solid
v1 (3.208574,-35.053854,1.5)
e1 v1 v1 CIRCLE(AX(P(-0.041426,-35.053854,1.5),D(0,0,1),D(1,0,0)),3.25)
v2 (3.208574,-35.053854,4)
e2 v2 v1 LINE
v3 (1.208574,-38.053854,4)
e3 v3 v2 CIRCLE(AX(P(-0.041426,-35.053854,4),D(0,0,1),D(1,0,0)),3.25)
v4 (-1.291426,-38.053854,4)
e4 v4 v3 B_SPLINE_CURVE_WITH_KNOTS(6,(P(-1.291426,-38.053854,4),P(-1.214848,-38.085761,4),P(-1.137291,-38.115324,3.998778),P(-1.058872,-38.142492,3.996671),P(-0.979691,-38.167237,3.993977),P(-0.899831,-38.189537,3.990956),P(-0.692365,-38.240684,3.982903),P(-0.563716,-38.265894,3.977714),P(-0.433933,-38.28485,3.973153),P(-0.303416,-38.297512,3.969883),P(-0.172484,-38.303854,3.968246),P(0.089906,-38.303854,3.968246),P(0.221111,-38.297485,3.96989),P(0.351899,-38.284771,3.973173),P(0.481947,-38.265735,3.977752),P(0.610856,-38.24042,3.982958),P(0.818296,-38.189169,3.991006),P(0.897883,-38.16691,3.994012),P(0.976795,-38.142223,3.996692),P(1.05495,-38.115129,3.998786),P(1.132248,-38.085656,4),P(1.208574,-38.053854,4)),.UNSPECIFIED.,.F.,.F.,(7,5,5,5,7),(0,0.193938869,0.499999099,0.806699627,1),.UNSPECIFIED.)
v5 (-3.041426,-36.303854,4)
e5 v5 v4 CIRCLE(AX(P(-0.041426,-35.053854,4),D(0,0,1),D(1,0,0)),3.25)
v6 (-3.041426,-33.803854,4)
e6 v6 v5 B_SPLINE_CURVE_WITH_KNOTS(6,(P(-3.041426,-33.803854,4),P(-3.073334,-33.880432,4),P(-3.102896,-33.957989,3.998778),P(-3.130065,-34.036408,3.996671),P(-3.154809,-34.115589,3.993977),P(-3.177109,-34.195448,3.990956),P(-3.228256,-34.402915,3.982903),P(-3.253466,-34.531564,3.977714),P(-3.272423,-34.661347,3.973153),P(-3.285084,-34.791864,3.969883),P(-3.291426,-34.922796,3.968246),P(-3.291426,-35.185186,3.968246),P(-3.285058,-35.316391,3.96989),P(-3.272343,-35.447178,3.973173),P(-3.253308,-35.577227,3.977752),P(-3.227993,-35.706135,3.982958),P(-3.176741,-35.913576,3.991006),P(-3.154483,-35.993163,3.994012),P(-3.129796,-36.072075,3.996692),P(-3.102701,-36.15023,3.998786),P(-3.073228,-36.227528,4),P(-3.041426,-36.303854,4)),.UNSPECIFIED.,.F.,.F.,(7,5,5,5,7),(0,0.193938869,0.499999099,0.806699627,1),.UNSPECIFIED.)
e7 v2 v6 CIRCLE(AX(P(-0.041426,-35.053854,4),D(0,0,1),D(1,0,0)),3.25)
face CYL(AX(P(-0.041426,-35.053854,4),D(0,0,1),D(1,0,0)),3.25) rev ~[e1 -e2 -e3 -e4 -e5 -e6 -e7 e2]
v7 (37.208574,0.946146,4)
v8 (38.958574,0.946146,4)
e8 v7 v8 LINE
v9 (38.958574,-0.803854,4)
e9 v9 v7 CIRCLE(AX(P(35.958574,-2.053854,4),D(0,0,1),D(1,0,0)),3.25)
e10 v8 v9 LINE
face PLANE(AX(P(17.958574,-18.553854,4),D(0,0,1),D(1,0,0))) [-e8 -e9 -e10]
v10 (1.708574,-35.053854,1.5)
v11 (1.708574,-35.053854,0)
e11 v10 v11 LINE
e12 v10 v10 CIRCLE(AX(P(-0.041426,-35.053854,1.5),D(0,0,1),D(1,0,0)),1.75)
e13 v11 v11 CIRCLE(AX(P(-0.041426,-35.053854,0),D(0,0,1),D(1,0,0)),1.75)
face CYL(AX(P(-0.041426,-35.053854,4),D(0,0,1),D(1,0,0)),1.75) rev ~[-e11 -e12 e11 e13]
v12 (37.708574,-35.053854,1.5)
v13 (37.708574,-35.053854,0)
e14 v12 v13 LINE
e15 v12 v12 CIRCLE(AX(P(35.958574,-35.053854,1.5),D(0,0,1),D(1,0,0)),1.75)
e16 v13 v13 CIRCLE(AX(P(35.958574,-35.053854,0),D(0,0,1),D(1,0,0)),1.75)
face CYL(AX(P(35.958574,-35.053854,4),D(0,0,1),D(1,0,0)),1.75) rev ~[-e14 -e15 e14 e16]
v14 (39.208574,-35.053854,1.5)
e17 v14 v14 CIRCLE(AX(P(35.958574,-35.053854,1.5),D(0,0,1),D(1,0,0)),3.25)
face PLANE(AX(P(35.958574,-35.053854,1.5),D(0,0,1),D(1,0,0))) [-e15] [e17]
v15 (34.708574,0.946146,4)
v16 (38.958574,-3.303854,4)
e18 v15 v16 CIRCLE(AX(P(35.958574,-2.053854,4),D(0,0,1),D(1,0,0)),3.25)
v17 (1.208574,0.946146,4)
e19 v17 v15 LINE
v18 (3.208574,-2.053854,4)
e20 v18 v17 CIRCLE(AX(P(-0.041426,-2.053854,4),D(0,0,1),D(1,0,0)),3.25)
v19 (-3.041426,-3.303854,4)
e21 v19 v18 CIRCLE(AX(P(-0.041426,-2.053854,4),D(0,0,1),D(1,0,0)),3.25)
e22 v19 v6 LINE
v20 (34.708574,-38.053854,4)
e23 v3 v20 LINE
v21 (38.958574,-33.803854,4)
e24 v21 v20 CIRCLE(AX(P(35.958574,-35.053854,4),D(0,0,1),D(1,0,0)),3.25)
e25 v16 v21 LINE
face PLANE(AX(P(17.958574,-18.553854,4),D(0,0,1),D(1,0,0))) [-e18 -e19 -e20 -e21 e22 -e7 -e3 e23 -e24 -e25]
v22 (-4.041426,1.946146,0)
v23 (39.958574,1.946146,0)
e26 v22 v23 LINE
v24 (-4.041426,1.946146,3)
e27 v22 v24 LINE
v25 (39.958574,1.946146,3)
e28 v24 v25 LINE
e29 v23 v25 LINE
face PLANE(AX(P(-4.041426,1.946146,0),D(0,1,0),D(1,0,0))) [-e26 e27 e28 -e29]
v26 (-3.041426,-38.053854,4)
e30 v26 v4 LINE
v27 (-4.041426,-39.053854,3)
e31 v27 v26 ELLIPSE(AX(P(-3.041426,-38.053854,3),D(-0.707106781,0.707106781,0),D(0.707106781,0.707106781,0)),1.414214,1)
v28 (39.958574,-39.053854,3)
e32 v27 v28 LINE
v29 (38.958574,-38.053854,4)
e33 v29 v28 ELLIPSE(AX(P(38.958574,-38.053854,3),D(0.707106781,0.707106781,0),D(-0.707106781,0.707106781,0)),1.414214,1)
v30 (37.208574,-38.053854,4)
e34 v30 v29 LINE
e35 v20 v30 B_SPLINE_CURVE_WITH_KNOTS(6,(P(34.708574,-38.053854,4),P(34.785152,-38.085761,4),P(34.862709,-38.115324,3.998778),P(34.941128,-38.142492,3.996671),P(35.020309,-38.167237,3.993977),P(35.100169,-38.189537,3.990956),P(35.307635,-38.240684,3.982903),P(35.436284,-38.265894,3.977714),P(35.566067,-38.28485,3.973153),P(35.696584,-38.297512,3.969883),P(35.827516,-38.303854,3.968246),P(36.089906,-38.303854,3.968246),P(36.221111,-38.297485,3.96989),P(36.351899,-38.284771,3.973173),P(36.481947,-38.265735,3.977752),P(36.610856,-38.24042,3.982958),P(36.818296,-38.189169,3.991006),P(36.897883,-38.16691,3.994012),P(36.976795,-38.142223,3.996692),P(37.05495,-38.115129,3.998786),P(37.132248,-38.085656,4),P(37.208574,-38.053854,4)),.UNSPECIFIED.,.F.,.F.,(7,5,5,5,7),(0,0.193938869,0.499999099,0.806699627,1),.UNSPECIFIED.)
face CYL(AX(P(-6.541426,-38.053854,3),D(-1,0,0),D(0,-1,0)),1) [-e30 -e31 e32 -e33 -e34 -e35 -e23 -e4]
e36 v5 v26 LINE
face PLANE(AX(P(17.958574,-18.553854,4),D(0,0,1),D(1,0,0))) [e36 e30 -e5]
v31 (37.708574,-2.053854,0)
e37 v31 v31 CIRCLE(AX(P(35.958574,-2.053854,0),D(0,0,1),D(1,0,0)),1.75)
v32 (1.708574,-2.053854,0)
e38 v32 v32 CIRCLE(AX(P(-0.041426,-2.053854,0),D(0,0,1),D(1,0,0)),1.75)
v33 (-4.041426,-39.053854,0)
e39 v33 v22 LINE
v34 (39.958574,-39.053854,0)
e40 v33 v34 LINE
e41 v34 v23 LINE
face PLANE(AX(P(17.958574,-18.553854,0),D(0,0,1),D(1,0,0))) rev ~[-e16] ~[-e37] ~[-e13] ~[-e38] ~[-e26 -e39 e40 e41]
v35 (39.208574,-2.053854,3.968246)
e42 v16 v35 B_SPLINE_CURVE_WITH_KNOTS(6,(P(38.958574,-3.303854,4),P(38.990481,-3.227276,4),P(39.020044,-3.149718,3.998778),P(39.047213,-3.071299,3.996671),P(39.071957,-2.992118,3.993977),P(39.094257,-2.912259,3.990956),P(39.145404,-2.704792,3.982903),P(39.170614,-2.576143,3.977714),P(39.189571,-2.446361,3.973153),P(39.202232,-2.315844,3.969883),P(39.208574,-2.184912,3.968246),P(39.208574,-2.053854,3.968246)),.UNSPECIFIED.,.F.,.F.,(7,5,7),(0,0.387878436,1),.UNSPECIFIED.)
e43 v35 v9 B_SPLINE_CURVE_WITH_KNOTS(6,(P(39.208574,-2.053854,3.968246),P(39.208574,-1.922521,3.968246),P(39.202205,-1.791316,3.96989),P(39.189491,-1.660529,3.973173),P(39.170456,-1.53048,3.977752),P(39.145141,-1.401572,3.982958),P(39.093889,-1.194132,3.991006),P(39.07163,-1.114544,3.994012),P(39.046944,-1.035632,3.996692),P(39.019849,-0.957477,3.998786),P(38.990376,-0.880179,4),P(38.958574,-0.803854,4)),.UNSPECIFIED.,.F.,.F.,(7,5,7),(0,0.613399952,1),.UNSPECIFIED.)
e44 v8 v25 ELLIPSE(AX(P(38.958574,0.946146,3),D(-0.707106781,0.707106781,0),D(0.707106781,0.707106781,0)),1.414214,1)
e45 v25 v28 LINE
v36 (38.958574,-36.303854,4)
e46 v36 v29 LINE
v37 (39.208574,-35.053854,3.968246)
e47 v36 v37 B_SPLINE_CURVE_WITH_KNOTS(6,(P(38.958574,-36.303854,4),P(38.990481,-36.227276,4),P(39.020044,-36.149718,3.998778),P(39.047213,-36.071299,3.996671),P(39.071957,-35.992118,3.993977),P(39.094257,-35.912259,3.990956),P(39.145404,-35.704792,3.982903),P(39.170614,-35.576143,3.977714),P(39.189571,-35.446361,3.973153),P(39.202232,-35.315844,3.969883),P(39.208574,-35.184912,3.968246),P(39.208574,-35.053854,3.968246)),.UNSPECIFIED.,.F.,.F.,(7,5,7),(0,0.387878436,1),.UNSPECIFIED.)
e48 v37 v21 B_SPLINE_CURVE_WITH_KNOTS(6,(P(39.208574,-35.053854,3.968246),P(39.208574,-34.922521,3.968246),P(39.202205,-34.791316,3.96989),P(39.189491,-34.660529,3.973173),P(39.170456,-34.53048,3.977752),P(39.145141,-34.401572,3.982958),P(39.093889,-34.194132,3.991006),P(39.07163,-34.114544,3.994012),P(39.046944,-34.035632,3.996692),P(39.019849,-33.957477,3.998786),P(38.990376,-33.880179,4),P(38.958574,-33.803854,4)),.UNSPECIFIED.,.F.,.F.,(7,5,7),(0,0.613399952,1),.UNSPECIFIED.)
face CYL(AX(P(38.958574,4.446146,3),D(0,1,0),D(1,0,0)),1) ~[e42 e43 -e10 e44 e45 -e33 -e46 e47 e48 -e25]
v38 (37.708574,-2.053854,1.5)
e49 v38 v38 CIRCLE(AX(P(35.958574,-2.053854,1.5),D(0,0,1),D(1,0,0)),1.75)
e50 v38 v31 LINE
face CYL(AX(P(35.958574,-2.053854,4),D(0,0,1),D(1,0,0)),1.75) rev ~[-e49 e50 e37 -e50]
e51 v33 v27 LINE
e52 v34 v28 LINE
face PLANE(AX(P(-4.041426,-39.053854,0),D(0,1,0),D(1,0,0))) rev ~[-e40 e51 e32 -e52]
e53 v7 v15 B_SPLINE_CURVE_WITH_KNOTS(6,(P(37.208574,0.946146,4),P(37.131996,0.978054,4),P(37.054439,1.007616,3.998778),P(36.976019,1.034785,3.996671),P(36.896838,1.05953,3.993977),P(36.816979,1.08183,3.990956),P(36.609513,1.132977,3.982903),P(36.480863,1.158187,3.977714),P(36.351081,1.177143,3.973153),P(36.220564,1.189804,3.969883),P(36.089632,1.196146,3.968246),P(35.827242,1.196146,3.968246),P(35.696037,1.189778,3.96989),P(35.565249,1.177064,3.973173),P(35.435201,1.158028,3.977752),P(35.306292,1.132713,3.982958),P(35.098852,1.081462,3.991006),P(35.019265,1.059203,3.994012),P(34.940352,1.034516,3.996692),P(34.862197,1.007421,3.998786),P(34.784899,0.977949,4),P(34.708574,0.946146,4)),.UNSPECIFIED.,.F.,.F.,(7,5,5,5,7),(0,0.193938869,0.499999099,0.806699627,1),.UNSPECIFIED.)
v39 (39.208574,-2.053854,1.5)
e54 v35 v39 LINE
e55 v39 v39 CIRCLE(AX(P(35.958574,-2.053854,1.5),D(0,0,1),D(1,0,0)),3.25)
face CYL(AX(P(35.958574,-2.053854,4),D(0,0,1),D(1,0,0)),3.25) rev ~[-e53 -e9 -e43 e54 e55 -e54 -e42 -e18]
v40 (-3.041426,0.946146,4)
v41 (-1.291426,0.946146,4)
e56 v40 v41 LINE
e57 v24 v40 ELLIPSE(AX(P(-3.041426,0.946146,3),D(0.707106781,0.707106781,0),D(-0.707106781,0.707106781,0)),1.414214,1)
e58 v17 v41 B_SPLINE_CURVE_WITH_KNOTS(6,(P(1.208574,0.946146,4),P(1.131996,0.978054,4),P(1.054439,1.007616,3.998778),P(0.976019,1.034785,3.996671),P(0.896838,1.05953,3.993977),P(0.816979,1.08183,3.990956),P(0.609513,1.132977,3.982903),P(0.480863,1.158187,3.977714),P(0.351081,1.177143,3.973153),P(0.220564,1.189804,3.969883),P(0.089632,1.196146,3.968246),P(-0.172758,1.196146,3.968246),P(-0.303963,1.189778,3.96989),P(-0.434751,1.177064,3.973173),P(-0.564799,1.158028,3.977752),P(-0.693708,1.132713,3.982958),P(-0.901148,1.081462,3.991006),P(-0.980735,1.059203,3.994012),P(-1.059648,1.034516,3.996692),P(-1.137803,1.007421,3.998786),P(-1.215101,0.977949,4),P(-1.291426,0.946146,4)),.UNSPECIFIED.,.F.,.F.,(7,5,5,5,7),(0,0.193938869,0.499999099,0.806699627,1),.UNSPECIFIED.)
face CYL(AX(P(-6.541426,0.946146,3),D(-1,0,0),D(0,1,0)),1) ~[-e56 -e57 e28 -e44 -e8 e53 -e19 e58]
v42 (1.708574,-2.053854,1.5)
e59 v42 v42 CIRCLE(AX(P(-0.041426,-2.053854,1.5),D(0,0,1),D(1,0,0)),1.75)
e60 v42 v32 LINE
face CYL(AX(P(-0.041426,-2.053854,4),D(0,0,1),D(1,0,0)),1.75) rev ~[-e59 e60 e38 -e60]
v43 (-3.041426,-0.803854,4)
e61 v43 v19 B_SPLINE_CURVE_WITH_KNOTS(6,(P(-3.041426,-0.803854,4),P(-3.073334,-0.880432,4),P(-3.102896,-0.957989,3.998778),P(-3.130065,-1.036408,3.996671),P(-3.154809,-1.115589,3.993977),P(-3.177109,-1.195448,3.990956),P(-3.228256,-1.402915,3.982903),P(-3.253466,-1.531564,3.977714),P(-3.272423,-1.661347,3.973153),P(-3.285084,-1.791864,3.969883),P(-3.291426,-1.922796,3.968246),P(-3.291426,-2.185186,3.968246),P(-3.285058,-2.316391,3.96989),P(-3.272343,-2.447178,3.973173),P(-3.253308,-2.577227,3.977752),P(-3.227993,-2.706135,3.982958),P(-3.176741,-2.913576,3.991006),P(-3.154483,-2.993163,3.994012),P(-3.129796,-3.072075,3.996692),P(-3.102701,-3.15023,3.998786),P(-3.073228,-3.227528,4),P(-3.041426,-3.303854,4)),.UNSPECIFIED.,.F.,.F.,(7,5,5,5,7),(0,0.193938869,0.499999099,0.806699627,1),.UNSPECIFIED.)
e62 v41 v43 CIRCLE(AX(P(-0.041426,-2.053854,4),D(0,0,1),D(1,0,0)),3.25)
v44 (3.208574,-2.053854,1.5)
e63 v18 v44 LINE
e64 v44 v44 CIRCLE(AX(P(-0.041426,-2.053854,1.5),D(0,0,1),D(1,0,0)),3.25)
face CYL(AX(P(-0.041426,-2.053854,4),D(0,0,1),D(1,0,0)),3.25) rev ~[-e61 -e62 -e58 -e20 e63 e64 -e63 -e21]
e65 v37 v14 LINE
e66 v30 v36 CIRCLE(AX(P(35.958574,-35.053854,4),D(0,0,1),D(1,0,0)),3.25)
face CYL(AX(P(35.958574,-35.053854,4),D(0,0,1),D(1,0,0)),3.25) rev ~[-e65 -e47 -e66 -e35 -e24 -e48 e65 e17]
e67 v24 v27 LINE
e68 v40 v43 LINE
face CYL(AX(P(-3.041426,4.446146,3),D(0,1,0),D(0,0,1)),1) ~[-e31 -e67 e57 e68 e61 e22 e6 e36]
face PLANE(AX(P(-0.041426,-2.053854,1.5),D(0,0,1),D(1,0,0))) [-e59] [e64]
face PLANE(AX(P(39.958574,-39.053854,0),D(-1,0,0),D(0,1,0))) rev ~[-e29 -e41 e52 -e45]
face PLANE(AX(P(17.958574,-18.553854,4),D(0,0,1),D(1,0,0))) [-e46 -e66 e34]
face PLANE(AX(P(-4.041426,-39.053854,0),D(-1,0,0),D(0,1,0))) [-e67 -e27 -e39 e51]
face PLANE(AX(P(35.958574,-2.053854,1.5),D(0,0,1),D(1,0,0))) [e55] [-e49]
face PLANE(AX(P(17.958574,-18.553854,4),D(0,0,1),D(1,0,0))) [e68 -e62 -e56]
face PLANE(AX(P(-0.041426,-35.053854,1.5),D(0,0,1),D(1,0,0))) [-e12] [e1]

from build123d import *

# Parameters (mm, degrees)
F0_W        = 44
F0_H        = 41
F1_DEPTH    = 4
F2_R        = 1.75
F3_DEPTH    = 4.001
F4_R        = 3.25
F5_DEPTH    = 2.5
F6_T1_DEPTH = 46
F6_T3_DEPTH = 49


# Not quite as in the source:
# - a fillet or chamfer that OpenCascade refuses, or shapes differently, is made with other operations: its cross-section is extruded or revolved along the edge and cut away or added


with BuildPart() as f1:
    # F0 (on Top) → F1 (new body)
    with BuildSketch(Plane.XY):
        with Locations((17.9585738778, -18.5538536012)):
            Rectangle(F0_W, F0_H)
    extrude(amount=F1_DEPTH)

    # F2 (on face) → F3 (cut, through all)
    with BuildSketch(Plane.XY.offset(4)):
        with Locations((-0.0414261222, -2.0538536012)):
            Circle(F2_R)
        with Locations((35.9585738778, -2.0538536012)):
            Circle(F2_R)
        with Locations((35.9585738778, -35.0538536012)):
            Circle(F2_R)
        with Locations((-0.0414261222, -35.0538536012)):
            Circle(F2_R)
    extrude(amount=-F3_DEPTH, mode=Mode.SUBTRACT)

    # F4 (on face) → F5 (cut)
    with BuildSketch(Plane.XY.offset(4)):
        with Locations((-0.0414261222, -2.0538536012)):
            Circle(F4_R)
        with Locations((35.9585738778, -2.0538536012)):
            Circle(F4_R)
        with Locations((35.9585738778, -35.0538536012)):
            Circle(F4_R)
        with Locations((-0.0414261222, -35.0538536012)):
            Circle(F4_R)
    extrude(amount=-F5_DEPTH, mode=Mode.SUBTRACT)

    # F6: fillet of radius 1 on 4 edges, made by hand

    # F6_s2 → F6_t1 (cut)
    with BuildSketch(Plane.XZ.offset(-4.4461463988)):
        with BuildLine():
            ThreePointArc((-3.0414261222, 4), (-3.7485329034, 3.7071067812), (-4.0414261222, 3))
            Line((-4.0414261222, 3), (-4.0414261222, 4))
            Line((-4.0414261222, 4), (-3.0414261222, 4))
        make_face()
        with BuildLine():
            ThreePointArc((39.9585738778, 3), (39.665680659, 3.7071067812), (38.9585738778, 4))
            Line((38.9585738778, 4), (39.9585738778, 4))
            Line((39.9585738778, 4), (39.9585738778, 3))
        make_face()
    extrude(amount=F6_T1_DEPTH, mode=Mode.SUBTRACT)

    # F6_s4 → F6_t3 (cut)
    with BuildSketch(Plane.YZ.offset(-6.5414261222)):
        with BuildLine():
            ThreePointArc((-39.0538536012, 3), (-38.7609603824, 3.7071067812), (-38.0538536012, 4))
            Line((-38.0538536012, 4), (-39.0538536012, 4))
            Line((-39.0538536012, 4), (-39.0538536012, 3))
        make_face()
        with BuildLine():
            ThreePointArc((1.9461463988, 3), (1.65325318, 3.7071067812), (0.9461463988, 4))
            Line((0.9461463988, 4), (1.9461463988, 4))
            Line((1.9461463988, 4), (1.9461463988, 3))
        make_face()
    extrude(amount=F6_T3_DEPTH, mode=Mode.SUBTRACT)


solid = f1.part
